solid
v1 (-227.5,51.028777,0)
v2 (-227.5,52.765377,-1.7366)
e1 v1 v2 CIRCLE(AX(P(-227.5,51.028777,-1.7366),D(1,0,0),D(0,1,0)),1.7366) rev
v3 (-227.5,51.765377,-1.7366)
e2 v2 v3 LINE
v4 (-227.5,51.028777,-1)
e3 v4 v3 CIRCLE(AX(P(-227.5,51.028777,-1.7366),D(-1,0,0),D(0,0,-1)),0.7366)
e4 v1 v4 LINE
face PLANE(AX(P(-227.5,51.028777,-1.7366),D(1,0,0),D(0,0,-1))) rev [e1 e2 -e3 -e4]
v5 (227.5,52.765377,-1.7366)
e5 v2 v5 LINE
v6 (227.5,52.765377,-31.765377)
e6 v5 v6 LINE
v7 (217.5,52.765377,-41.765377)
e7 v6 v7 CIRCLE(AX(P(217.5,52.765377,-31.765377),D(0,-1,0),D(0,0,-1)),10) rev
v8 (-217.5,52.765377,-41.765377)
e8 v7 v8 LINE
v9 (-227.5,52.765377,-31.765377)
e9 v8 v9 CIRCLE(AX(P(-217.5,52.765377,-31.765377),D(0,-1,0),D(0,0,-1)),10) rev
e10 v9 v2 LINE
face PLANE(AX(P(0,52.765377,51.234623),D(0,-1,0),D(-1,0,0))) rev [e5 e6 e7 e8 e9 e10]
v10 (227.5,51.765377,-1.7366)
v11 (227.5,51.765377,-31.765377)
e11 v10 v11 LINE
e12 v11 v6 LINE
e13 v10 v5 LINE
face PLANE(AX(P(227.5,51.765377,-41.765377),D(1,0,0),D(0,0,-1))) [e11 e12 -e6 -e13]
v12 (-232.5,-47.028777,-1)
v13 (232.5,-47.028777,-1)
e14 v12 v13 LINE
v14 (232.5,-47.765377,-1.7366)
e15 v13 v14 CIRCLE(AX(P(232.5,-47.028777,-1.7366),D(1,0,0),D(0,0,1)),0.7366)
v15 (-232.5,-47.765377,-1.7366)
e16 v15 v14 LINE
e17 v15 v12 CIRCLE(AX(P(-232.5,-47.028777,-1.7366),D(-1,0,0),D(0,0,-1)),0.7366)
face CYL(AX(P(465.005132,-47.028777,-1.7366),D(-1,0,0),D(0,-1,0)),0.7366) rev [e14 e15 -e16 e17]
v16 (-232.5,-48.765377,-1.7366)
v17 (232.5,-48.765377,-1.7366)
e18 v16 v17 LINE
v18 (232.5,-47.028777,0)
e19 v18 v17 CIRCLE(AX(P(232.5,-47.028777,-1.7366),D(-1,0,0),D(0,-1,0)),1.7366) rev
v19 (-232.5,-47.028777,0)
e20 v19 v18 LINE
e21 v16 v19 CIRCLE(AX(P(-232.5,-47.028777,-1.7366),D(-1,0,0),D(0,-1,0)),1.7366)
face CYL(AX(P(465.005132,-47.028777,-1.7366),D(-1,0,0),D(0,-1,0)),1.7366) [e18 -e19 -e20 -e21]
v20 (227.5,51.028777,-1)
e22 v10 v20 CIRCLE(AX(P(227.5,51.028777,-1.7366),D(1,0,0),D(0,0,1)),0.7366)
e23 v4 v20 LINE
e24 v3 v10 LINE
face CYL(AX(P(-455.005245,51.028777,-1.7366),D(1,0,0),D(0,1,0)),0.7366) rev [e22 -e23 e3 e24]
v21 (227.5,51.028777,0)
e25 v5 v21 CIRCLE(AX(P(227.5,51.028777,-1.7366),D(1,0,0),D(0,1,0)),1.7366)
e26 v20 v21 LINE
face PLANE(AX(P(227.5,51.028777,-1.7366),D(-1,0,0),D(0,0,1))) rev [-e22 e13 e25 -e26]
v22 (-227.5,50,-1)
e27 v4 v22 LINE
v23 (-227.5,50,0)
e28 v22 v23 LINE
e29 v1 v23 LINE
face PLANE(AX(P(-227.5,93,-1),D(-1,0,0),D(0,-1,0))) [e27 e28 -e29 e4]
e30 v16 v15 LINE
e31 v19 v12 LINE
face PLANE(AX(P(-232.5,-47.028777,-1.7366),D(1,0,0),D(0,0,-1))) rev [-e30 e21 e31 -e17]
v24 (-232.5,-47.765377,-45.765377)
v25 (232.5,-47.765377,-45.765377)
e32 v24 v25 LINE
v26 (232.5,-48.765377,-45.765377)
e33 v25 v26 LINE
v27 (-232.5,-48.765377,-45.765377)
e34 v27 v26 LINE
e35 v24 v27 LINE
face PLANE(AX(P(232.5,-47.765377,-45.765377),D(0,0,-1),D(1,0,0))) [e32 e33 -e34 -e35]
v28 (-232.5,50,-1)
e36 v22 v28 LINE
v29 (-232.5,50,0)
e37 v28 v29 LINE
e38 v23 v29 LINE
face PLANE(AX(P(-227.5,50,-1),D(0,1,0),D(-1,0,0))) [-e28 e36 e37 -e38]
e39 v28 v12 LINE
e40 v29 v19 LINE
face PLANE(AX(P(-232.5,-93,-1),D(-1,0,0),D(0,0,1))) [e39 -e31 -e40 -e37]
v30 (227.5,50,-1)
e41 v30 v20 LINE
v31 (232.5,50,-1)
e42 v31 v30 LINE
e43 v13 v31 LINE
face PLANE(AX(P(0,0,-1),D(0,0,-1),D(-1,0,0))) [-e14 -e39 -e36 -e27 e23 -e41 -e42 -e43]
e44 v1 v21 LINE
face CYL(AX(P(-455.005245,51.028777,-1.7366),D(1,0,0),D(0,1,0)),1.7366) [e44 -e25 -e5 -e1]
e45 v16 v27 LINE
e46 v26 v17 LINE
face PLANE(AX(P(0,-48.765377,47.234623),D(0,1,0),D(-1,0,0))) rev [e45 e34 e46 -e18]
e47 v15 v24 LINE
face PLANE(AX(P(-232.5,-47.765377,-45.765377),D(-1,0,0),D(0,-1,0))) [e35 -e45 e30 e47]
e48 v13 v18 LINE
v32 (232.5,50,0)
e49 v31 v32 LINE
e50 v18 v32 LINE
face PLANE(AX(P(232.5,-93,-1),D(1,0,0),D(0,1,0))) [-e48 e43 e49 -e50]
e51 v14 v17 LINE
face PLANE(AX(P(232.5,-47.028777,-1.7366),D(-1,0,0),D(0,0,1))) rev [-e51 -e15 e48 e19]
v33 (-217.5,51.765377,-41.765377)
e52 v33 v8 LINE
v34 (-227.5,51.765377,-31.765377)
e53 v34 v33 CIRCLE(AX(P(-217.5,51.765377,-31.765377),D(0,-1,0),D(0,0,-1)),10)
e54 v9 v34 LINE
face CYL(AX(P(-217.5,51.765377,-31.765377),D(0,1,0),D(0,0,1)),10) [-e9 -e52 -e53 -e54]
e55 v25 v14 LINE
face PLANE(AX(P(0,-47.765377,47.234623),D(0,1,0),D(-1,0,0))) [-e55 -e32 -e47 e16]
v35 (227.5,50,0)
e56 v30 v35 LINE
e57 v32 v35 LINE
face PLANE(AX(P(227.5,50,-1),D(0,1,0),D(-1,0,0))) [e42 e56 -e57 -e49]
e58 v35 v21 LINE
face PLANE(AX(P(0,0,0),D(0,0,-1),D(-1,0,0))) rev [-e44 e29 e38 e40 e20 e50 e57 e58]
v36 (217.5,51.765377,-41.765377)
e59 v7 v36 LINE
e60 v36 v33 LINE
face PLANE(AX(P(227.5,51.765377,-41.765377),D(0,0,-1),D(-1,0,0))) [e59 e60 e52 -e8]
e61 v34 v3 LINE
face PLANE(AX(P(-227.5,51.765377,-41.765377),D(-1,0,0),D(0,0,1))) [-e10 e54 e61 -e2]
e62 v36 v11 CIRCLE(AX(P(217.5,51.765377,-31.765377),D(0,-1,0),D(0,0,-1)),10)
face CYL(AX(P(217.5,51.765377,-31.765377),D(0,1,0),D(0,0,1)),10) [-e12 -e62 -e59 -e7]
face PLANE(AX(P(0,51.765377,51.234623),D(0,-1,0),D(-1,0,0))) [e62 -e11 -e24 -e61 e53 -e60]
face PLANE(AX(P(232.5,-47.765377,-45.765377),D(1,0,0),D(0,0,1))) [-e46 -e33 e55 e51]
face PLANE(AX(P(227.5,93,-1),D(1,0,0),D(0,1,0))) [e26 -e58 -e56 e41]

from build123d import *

# Parameters (mm, degrees)
BASE_FLANGE1_DEPTH     = 1
SKETCHED_START         = -232.5
SKETCHED_BEND1_DEPTH   = 465
SKETCHED_START_2       = -227.5
SKETCHED_BEND1_2_DEPTH = 455
SKETCHED_BEND1_3_DEPTH = 465
FILLET1_R              = 10


# Read off the part's stored shape, not the designer's step: Sketched Bend1
# Sheet-metal steps are written as plain solids
with BuildPart() as part:
    # Sketch1 → Base-Flange1 (new body)
    with BuildSketch(Plane.XY):
        Polygon((-227.5, 93), (-227.5, 50), (-232.5, 50), (-232.5, -93), (232.5, -93), (232.5, 50), (227.5, 50), (227.5, 93), align=None)
    extrude(amount=-BASE_FLANGE1_DEPTH)

    # Sketched Bend1 outline → Sketched Bend1 (cut)
    with BuildSketch(Plane.YZ.offset(SKETCHED_START)):
        with BuildLine():
            ThreePointArc((51.028776631, 0), (51.960602795, -0.271171885), (52.601417721, -1))
            Line((52.601417721, -1), (93, -1))
            Line((93, -1), (93, 0))
            Line((93, 0), (51.028776631, 0))
        make_face()
        with BuildLine():
            Line((-93, -1), (-48.601417721, -1))
            ThreePointArc((-48.601417721, -1), (-47.960602795, -0.271171885), (-47.028776631, 0))
            Line((-47.028776631, 0), (-93, 0))
            Line((-93, 0), (-93, -1))
        make_face()
    extrude(amount=SKETCHED_BEND1_DEPTH, mode=Mode.SUBTRACT)

    # Sketched Bend1 2 outline → Sketched Bend1 2 (add)
    with BuildSketch(Plane.YZ.offset(SKETCHED_START_2)):
        with BuildLine():
            ThreePointArc((51.028776631, -1), (51.549631486, -1.215745145), (51.765376631, -1.7366))
            Line((51.765376631, -1.7366), (51.765376631, -41.765376631))
            Line((51.765376631, -41.765376631), (52.765376631, -41.765376631))
            Line((52.765376631, -41.765376631), (52.765376631, -1.7366))
            ThreePointArc((52.765376631, -1.7366), (52.723891388, -1.359286442), (52.601417721, -1))
            Line((52.601417721, -1), (51.028776631, -1))
        make_face()
        with BuildLine():
            ThreePointArc((-47.765376631, -1.7366), (-47.549631486, -1.215745145), (-47.028776631, -1))
            Line((-47.028776631, -1), (-48.601417721, -1))
            ThreePointArc((-48.601417721, -1), (-48.723891388, -1.359286442), (-48.765376631, -1.7366))
            Line((-48.765376631, -1.7366), (-48.765376631, -45.765376631))
            Line((-48.765376631, -45.765376631), (-47.765376631, -45.765376631))
            Line((-47.765376631, -45.765376631), (-47.765376631, -1.7366))
        make_face()
    extrude(amount=SKETCHED_BEND1_2_DEPTH)

    # Sketched Bend1 3 outline → Sketched Bend1 3 (add)
    with BuildSketch(Plane.YZ.offset(SKETCHED_START)):
        with BuildLine():
            ThreePointArc((-47.765376631, -1.7366), (-47.549631486, -1.215745145), (-47.028776631, -1))
            Line((-47.028776631, -1), (-48.601417721, -1))
            ThreePointArc((-48.601417721, -1), (-48.723891388, -1.359286442), (-48.765376631, -1.7366))
            Line((-48.765376631, -1.7366), (-48.765376631, -45.765376631))
            Line((-48.765376631, -45.765376631), (-47.765376631, -45.765376631))
            Line((-47.765376631, -45.765376631), (-47.765376631, -1.7366))
        make_face()
    extrude(amount=SKETCHED_BEND1_3_DEPTH)

    # Fillet1
    fillet1_edges = [part.edges().sort_by_distance(p)[0] for p in [
        (-227.5, 52.265376631, -41.765376631),
        (227.5, 52.265376631, -41.765376631),
    ]]
    fillet(fillet1_edges, radius=FILLET1_R)


solid = part.part
